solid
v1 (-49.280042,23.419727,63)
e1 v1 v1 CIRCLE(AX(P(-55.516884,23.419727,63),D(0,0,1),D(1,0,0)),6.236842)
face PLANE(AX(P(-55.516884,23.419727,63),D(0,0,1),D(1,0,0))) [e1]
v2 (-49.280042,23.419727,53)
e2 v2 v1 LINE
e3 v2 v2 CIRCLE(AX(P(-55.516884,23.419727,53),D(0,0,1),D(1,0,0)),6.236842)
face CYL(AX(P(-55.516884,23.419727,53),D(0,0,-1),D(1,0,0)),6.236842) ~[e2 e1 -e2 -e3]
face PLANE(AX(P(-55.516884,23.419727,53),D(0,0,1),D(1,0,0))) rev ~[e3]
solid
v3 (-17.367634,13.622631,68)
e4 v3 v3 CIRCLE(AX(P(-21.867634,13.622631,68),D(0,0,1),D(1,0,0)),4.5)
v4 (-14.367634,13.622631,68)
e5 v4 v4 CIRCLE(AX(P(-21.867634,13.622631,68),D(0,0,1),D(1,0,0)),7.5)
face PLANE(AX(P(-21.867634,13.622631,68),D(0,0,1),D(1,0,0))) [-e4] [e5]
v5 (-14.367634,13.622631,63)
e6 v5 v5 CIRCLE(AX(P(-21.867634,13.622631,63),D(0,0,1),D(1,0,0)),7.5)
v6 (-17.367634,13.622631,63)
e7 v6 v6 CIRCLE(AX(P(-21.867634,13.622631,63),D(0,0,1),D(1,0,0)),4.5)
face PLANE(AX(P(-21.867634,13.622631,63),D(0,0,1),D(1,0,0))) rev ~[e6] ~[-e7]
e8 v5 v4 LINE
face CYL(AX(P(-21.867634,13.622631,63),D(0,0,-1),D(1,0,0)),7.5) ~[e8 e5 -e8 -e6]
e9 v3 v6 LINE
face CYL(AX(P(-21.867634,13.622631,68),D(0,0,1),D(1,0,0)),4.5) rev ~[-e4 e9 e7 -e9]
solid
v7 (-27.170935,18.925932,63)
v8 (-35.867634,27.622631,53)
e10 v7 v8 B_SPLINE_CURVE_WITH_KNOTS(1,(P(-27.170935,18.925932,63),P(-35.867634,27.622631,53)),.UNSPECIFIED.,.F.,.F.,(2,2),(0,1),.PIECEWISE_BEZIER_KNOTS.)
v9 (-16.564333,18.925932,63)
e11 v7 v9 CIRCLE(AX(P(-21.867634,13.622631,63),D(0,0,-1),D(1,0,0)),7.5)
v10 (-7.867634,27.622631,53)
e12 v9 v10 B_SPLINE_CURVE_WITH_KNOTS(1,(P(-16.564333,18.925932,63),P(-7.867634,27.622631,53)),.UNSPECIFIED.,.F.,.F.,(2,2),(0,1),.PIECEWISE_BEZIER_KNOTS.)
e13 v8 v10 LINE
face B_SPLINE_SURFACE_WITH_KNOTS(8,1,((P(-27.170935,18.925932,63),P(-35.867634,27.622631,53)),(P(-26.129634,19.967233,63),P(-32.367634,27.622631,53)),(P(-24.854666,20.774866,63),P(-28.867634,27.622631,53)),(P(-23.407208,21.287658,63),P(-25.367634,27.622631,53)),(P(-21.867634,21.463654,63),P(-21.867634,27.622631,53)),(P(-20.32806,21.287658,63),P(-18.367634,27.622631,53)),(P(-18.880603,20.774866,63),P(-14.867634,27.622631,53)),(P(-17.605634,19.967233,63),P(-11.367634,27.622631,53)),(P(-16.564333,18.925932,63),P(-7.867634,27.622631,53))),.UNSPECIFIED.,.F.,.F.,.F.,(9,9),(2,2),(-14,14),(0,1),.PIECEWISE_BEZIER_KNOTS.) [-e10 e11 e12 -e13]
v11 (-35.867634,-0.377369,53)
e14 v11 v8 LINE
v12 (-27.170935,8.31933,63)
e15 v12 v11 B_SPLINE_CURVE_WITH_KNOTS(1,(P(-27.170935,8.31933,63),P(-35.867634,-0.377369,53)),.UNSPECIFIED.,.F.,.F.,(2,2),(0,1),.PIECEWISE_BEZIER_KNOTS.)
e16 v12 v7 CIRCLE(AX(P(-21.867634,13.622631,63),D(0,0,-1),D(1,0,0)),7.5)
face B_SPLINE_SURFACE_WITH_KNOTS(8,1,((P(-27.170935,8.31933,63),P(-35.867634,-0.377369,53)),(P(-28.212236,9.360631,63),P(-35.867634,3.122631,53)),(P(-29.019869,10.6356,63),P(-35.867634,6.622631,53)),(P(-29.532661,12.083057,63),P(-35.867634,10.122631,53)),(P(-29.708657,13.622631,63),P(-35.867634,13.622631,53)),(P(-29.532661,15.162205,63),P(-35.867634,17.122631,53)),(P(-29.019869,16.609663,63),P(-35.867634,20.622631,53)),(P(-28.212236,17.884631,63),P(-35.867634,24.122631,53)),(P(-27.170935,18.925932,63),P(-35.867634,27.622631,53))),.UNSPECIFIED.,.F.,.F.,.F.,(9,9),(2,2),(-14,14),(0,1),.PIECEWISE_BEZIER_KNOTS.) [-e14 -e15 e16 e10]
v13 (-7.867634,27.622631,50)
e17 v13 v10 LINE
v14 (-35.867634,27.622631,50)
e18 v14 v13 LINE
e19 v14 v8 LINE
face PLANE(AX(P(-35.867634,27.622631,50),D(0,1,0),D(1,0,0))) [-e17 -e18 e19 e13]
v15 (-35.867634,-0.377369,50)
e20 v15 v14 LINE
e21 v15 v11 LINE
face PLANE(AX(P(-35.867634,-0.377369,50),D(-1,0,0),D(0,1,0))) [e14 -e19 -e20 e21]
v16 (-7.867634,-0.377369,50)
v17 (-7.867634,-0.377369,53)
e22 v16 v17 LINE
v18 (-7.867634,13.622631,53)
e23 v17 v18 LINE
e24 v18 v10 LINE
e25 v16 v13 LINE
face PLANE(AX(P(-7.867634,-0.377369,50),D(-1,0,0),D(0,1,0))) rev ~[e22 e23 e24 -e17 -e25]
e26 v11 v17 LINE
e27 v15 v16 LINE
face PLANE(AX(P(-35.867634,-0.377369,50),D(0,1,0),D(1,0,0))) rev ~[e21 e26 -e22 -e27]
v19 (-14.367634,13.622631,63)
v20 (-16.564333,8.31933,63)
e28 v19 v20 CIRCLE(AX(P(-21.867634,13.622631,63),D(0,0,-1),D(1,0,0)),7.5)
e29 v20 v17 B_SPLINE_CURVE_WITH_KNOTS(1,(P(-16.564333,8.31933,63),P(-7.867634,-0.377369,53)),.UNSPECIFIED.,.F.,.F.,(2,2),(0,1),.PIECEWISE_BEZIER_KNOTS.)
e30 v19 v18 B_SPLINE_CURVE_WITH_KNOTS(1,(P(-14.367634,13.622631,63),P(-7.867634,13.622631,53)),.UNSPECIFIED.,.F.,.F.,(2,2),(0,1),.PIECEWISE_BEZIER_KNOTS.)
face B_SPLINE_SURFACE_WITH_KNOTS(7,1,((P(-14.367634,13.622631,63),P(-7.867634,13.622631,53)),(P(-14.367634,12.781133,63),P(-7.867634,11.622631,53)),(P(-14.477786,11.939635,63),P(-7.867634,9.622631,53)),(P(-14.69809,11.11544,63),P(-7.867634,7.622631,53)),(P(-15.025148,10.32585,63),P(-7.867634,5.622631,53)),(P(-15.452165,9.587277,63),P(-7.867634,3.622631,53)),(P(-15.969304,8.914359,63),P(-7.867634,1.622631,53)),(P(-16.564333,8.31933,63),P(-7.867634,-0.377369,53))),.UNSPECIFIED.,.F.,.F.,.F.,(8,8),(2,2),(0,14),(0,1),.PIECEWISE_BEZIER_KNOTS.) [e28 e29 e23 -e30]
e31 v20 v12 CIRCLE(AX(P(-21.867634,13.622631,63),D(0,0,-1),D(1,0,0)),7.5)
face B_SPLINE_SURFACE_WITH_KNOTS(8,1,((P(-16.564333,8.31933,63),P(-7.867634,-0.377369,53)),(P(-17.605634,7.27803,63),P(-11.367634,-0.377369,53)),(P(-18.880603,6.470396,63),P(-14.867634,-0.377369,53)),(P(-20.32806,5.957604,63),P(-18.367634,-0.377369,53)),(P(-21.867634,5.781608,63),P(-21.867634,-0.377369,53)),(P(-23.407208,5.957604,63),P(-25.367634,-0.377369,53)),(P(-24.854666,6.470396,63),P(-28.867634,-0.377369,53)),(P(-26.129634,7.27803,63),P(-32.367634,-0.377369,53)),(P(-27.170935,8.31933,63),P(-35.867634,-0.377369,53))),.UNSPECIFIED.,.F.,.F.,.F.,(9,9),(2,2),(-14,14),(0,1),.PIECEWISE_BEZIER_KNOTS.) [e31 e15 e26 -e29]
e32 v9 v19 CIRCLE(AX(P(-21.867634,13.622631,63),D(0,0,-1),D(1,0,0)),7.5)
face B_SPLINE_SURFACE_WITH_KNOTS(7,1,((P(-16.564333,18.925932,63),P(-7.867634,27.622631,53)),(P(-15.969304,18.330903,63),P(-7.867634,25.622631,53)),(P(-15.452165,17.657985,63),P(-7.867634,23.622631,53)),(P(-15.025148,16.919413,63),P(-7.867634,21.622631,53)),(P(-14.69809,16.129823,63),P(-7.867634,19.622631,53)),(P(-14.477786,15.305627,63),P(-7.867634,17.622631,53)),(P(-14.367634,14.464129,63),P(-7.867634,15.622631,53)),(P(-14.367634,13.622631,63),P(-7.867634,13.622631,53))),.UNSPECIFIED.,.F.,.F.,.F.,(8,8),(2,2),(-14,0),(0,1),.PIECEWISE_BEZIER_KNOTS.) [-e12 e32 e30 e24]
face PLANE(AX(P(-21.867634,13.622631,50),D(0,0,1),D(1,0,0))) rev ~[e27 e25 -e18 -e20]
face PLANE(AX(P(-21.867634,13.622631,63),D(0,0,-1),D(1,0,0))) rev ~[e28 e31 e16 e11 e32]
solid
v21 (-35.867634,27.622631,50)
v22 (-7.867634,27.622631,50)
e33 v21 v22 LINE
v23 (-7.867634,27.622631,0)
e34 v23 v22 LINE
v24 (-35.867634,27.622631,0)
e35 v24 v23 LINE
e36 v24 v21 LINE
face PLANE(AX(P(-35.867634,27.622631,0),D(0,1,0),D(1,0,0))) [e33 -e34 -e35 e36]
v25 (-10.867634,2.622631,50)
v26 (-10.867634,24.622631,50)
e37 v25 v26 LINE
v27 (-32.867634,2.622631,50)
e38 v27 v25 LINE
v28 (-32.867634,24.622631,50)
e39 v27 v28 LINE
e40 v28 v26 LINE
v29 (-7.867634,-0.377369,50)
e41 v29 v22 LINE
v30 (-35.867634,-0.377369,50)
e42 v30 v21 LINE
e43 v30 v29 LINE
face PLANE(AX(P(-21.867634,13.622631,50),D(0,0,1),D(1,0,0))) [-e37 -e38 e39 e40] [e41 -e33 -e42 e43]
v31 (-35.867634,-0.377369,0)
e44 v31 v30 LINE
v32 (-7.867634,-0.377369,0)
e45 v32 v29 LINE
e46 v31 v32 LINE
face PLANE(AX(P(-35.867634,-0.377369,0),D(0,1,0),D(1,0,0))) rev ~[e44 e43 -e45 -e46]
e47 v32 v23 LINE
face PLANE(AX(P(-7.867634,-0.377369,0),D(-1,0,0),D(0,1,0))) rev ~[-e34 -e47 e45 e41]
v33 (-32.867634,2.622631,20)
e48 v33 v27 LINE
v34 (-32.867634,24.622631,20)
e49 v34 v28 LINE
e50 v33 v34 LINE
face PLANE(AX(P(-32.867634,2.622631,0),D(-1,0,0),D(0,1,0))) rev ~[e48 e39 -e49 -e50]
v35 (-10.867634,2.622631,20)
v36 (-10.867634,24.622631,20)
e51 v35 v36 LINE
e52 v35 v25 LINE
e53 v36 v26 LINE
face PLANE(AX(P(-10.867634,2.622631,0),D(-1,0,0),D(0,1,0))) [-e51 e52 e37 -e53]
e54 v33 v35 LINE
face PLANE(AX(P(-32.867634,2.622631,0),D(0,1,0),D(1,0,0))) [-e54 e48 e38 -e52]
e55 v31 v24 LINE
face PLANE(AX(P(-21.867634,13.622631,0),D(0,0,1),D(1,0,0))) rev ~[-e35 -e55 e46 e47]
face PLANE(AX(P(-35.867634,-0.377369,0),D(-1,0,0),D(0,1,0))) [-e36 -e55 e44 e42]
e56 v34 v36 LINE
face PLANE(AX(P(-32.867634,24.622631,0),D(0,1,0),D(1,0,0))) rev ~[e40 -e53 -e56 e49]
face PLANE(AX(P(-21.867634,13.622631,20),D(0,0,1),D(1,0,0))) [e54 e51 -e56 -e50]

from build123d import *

# Parameters (mm, degrees)
F0_W      = 28
F0_H      = 28
F0_W_2    = 22
F0_H_2    = 22
F1_DEPTH  = 50
F2_DEPTH  = 20
F3_W      = 28
F3_H      = 28
F3_W_2    = 22
F3_H_2    = 22
F4_DEPTH  = 3
F5_R      = 6.2368420166
F6_DEPTH  = 10
F7_R      = 7.5
F8_DEPTH  = 5
F8_FACE_R = 7.5
F4_FACE_W = 28
F4_FACE_H = 28
F10_R     = 4.5
F11_DEPTH = 200


with BuildPart() as f1:
    # F0 (on Top) → F1 (new body)
    with BuildSketch(Plane.XY):
        with Locations((-21.8676342088, 13.622631086)):
            Rectangle(F0_W, F0_H)
        with Locations((-21.8676342088, 13.622631086)):
            Rectangle(F0_W_2, F0_H_2, mode=Mode.SUBTRACT)
    extrude(amount=F1_DEPTH)

    # F0 (on Top) → F2 (join)
    with BuildSketch(Plane.XY):
        with Locations((-21.8676342088, 13.622631086)):
            Rectangle(F0_W_2, F0_H_2)
    extrude(amount=F2_DEPTH)


with BuildPart() as f4:
    # F3 (on face) → F4 (new body)
    with BuildSketch(Plane.XY.offset(50)):
        with Locations((-21.8676342088, 13.622631086)):
            Rectangle(F3_W, F3_H)
        with Locations((-21.8676342088, 13.622631086)):
            Rectangle(F3_W_2, F3_H_2, mode=Mode.SUBTRACT)
        with Locations((-21.8676342088, 13.622631086)):
            Rectangle(F3_W_2, F3_H_2)
    extrude(amount=F4_DEPTH)

    # F8_face (on face) → F9 section 0
    with BuildSketch(Plane(origin=(-21.8676342088, 13.622631086, 63), x_dir=(1, 0, 0), z_dir=(0, 0, -1))):
        Circle(F8_FACE_R)
    # F4_face (on face) → F9 section 1
    with BuildSketch(Plane(origin=(-21.8676342088, 13.622631086, 53), x_dir=(1, 0, 0), z_dir=(0, 0, 1))):
        Rectangle(F4_FACE_W, F4_FACE_H)
    loft()


with BuildPart() as f6:
    # F5 (on face) → F6 (new body)
    with BuildSketch(Plane.XY.offset(53)):
        with Locations((-55.5168837309, 23.41972664)):
            Circle(F5_R)
    extrude(amount=F6_DEPTH)


with BuildPart() as f8:
    # F7 (on face) → F8 (new body)
    with BuildSketch(Plane.XY.offset(63)):
        with Locations((-21.8676342088, 13.622631086)):
            Circle(F7_R)
    extrude(amount=F8_DEPTH)

    # F10 (on face) + F7 (on face) + F5 (on face) → F11 (cut)
    with BuildSketch(Plane.XY.offset(68)):
        with Locations((-21.8676342088, 13.622631086)):
            Circle(F10_R)
    with BuildSketch(Plane.XY.offset(63)):
        with Locations((-21.8676342088, 13.622631086)):
            Circle(F7_R)
    with BuildSketch(Plane.XY.offset(53)):
        with Locations((-55.5168837309, 23.41972664)):
            Circle(F5_R)
    extrude(amount=-F11_DEPTH, mode=Mode.SUBTRACT)


solid = Compound([f1.part, f4.part, f6.part, f8.part])
